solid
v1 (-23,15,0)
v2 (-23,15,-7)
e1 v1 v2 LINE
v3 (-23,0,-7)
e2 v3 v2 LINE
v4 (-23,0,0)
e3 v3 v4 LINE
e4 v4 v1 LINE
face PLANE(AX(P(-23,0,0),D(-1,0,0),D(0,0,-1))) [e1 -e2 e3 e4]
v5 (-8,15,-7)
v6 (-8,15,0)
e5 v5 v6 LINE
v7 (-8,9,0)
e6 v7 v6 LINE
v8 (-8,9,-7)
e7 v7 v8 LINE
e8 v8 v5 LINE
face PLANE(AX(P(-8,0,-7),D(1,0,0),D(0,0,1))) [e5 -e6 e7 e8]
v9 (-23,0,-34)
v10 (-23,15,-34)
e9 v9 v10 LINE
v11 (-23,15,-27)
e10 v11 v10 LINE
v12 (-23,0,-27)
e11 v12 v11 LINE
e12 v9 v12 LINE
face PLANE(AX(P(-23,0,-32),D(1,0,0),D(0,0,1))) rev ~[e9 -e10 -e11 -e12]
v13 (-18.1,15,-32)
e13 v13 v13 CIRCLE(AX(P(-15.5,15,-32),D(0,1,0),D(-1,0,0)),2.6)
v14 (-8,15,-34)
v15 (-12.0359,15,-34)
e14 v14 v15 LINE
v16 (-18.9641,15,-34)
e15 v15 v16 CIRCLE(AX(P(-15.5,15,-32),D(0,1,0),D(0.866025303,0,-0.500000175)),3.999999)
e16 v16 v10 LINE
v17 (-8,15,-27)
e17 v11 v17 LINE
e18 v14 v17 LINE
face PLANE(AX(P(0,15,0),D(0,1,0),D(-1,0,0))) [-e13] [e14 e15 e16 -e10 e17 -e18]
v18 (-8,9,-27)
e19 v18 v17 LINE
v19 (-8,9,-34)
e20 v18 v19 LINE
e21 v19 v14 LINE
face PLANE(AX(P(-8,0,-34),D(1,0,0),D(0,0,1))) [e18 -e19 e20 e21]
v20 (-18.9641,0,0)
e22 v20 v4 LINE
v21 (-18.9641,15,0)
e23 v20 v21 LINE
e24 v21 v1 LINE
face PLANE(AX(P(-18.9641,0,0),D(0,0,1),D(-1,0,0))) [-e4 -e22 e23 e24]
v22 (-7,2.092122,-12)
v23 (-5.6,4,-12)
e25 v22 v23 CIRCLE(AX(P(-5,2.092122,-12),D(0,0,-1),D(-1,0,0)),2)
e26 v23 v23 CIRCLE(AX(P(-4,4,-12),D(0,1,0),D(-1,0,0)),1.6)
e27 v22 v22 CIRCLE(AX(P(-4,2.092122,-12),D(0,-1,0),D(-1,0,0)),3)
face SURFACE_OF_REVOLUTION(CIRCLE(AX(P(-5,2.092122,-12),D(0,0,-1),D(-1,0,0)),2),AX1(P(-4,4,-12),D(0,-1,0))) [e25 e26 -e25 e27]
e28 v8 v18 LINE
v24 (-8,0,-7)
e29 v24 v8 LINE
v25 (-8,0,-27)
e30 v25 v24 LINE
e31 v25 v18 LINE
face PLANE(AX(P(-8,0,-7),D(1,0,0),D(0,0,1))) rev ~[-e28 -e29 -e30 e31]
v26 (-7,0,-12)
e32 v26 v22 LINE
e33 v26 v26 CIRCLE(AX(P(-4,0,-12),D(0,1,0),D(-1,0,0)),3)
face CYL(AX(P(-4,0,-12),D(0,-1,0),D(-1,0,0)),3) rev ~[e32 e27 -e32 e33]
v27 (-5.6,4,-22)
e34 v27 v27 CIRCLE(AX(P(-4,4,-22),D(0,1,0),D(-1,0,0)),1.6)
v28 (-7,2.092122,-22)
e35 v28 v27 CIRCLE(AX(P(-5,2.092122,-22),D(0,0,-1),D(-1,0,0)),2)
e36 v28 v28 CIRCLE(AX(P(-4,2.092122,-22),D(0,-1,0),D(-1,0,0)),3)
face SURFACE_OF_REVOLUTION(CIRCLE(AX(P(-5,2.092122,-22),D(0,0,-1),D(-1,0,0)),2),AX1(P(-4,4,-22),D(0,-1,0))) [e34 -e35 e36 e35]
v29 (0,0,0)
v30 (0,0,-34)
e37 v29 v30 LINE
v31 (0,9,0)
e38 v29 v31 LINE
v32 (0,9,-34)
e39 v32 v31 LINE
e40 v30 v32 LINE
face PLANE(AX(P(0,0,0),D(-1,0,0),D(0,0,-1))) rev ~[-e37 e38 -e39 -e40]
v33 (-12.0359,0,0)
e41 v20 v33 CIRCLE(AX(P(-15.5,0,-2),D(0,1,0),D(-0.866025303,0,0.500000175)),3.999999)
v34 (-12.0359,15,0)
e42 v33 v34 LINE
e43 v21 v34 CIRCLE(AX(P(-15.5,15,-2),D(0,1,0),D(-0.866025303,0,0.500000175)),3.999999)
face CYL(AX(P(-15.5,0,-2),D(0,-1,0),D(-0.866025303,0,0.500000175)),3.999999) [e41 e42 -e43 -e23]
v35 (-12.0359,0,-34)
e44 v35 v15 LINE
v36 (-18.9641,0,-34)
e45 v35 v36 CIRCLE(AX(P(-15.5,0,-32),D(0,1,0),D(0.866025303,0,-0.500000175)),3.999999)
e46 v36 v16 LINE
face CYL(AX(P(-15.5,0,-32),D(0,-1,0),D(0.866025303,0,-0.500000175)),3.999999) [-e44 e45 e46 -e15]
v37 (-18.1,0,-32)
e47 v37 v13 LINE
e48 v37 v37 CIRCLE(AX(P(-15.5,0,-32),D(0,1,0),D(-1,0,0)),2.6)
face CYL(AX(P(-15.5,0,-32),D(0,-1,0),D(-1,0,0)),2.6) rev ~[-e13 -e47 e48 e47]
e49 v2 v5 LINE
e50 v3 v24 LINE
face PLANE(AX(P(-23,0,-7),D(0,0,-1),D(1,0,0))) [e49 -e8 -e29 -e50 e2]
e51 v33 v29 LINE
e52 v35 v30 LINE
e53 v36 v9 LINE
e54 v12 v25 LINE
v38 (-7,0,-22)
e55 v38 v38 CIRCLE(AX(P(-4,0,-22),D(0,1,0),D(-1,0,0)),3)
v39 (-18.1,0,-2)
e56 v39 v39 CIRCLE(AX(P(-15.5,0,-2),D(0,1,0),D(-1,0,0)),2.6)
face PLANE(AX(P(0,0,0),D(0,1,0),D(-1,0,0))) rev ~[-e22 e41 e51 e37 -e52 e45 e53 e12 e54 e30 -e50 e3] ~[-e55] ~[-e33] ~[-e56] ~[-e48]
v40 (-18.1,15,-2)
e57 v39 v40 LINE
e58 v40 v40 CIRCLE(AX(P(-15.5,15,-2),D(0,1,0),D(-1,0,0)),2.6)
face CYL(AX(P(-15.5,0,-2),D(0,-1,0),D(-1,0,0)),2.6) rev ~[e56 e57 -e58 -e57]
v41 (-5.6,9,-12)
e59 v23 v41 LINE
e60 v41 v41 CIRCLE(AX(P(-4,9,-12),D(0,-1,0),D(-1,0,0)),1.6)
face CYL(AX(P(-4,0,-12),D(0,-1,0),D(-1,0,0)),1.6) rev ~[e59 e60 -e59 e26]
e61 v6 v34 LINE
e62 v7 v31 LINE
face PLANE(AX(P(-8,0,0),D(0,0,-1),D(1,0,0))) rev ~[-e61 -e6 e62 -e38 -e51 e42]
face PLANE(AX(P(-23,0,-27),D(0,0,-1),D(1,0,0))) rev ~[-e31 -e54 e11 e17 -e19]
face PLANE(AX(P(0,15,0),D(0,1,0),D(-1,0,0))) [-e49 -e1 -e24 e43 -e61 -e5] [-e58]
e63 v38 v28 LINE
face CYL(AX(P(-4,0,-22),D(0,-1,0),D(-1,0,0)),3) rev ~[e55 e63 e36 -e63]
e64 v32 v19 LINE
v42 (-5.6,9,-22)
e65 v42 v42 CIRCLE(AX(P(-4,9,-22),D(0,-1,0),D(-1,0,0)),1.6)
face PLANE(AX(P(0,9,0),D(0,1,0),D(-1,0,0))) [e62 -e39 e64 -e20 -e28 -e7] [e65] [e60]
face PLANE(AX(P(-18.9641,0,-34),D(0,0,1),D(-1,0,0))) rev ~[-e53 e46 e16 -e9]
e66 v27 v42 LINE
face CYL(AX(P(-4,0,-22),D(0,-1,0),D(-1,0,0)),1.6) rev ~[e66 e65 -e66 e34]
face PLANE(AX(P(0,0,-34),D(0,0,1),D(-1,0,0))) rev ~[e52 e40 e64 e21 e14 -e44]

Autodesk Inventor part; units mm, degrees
ref_plane "YZ Plane" through (0, 0, 0) normal (1, 0, 0) x (0, 1, 0)
ref_plane "XZ Plane" through (0, 0, 0) normal (0, 1, 0) x (-1, 0, 0)
ref_plane "XY Plane" through (0, 0, 0) normal (0, 0, 1) x (1, 0, 0)
sketch "Sketch1" plane through (0, 0, 0) normal (0, 1, 0) x (-1, 0, 0)
  line L0 (0, 0) -> (0, -34)
  line L1 (0, -34) -> (8, -34)
  line L2 (8, -34) -> (8, 0)
  line L3 (8, 0) -> (0, 0)
  line L4 (23, -34) -> (23, -27)
  line L5 (23, -27) -> (8, -27)
  line L6 (23, 0) -> (23, -7)
  line L7 (23, -7) -> (8, -7)
  line L8 (8, -7) -> (8, -27)
  line L9 (8, -17) -> (4, -17)
  line L10 (4, -17) -> (4, -22)
  line L11 (4, -17) -> (4, -12)
  circle A0 centre (4, -12) radius 1.6
  circle A1 centre (4, -22) radius 1.6
  line L12 (8, -7) -> (0, -7)
  line L13 (8, -27) -> (0, -27)
  line L14 (23, -7) -> (23, -2)
  circle A2 centre (15.5, -2) radius 2.6
  arc A3 (18.9641, 0) -> (12.0359, 0) centre (15.5, -2) ccw
  line L15 (8, 0) -> (12.0359, 0)
  line L16 (18.9641, 0) -> (23, 0)
  line L17 (23, -27) -> (23, -32)
  circle A4 centre (15.5, -32) radius 2.6
  arc A5 (12.0359, -34) -> (18.9641, -34) centre (15.5, -32) ccw
  line L18 (8, -34) -> (12.0359, -34)
  line L19 (18.9641, -34) -> (23, -34)
  circle A6 centre (4, -12) radius 3
  circle A7 centre (4, -22) radius 3
  dimension "d0" = 34
  dimension "d1" = 8
  dimension "d2" = 15
  dimension "d3" = 7
  dimension "d4" = 15
  dimension "d5" = 7
  dimension "d6" = 4
  dimension "d7" = 5
  dimension "d8" = 5
  dimension "d9" = 3.2
  dimension "d10" = 3.2
  dimension "d11" = 5
  dimension "d12" = 5.2
  dimension "d13" = 8
  dimension "d14" = 5
  dimension "d15" = 5.2
  dimension "d16" = 8
  dimension "d21" = 6
  dimension "d22" = 6
extrude "Extrusion1" add sketch "Sketch1" along normal blind 9 contours L3 L2 L12 L0 | L12 L2 L13 L0 | L13 L2 L1 L0 | A6 | A7
extrude "Extrusion2" add sketch "Sketch1" along normal blind 15 contours L15 A3 L16 L6 L7 L2 | L5 L4 L19 A5 L18 L2
extrude "Extrusion3" cut sketch "Sketch1" along normal blind 4 contours A6 | A7
fillet "Fillet1" radius 2 2 edges at (-1, 4, -22) (-1, 4, -12)
properties part number "servo_holder"
